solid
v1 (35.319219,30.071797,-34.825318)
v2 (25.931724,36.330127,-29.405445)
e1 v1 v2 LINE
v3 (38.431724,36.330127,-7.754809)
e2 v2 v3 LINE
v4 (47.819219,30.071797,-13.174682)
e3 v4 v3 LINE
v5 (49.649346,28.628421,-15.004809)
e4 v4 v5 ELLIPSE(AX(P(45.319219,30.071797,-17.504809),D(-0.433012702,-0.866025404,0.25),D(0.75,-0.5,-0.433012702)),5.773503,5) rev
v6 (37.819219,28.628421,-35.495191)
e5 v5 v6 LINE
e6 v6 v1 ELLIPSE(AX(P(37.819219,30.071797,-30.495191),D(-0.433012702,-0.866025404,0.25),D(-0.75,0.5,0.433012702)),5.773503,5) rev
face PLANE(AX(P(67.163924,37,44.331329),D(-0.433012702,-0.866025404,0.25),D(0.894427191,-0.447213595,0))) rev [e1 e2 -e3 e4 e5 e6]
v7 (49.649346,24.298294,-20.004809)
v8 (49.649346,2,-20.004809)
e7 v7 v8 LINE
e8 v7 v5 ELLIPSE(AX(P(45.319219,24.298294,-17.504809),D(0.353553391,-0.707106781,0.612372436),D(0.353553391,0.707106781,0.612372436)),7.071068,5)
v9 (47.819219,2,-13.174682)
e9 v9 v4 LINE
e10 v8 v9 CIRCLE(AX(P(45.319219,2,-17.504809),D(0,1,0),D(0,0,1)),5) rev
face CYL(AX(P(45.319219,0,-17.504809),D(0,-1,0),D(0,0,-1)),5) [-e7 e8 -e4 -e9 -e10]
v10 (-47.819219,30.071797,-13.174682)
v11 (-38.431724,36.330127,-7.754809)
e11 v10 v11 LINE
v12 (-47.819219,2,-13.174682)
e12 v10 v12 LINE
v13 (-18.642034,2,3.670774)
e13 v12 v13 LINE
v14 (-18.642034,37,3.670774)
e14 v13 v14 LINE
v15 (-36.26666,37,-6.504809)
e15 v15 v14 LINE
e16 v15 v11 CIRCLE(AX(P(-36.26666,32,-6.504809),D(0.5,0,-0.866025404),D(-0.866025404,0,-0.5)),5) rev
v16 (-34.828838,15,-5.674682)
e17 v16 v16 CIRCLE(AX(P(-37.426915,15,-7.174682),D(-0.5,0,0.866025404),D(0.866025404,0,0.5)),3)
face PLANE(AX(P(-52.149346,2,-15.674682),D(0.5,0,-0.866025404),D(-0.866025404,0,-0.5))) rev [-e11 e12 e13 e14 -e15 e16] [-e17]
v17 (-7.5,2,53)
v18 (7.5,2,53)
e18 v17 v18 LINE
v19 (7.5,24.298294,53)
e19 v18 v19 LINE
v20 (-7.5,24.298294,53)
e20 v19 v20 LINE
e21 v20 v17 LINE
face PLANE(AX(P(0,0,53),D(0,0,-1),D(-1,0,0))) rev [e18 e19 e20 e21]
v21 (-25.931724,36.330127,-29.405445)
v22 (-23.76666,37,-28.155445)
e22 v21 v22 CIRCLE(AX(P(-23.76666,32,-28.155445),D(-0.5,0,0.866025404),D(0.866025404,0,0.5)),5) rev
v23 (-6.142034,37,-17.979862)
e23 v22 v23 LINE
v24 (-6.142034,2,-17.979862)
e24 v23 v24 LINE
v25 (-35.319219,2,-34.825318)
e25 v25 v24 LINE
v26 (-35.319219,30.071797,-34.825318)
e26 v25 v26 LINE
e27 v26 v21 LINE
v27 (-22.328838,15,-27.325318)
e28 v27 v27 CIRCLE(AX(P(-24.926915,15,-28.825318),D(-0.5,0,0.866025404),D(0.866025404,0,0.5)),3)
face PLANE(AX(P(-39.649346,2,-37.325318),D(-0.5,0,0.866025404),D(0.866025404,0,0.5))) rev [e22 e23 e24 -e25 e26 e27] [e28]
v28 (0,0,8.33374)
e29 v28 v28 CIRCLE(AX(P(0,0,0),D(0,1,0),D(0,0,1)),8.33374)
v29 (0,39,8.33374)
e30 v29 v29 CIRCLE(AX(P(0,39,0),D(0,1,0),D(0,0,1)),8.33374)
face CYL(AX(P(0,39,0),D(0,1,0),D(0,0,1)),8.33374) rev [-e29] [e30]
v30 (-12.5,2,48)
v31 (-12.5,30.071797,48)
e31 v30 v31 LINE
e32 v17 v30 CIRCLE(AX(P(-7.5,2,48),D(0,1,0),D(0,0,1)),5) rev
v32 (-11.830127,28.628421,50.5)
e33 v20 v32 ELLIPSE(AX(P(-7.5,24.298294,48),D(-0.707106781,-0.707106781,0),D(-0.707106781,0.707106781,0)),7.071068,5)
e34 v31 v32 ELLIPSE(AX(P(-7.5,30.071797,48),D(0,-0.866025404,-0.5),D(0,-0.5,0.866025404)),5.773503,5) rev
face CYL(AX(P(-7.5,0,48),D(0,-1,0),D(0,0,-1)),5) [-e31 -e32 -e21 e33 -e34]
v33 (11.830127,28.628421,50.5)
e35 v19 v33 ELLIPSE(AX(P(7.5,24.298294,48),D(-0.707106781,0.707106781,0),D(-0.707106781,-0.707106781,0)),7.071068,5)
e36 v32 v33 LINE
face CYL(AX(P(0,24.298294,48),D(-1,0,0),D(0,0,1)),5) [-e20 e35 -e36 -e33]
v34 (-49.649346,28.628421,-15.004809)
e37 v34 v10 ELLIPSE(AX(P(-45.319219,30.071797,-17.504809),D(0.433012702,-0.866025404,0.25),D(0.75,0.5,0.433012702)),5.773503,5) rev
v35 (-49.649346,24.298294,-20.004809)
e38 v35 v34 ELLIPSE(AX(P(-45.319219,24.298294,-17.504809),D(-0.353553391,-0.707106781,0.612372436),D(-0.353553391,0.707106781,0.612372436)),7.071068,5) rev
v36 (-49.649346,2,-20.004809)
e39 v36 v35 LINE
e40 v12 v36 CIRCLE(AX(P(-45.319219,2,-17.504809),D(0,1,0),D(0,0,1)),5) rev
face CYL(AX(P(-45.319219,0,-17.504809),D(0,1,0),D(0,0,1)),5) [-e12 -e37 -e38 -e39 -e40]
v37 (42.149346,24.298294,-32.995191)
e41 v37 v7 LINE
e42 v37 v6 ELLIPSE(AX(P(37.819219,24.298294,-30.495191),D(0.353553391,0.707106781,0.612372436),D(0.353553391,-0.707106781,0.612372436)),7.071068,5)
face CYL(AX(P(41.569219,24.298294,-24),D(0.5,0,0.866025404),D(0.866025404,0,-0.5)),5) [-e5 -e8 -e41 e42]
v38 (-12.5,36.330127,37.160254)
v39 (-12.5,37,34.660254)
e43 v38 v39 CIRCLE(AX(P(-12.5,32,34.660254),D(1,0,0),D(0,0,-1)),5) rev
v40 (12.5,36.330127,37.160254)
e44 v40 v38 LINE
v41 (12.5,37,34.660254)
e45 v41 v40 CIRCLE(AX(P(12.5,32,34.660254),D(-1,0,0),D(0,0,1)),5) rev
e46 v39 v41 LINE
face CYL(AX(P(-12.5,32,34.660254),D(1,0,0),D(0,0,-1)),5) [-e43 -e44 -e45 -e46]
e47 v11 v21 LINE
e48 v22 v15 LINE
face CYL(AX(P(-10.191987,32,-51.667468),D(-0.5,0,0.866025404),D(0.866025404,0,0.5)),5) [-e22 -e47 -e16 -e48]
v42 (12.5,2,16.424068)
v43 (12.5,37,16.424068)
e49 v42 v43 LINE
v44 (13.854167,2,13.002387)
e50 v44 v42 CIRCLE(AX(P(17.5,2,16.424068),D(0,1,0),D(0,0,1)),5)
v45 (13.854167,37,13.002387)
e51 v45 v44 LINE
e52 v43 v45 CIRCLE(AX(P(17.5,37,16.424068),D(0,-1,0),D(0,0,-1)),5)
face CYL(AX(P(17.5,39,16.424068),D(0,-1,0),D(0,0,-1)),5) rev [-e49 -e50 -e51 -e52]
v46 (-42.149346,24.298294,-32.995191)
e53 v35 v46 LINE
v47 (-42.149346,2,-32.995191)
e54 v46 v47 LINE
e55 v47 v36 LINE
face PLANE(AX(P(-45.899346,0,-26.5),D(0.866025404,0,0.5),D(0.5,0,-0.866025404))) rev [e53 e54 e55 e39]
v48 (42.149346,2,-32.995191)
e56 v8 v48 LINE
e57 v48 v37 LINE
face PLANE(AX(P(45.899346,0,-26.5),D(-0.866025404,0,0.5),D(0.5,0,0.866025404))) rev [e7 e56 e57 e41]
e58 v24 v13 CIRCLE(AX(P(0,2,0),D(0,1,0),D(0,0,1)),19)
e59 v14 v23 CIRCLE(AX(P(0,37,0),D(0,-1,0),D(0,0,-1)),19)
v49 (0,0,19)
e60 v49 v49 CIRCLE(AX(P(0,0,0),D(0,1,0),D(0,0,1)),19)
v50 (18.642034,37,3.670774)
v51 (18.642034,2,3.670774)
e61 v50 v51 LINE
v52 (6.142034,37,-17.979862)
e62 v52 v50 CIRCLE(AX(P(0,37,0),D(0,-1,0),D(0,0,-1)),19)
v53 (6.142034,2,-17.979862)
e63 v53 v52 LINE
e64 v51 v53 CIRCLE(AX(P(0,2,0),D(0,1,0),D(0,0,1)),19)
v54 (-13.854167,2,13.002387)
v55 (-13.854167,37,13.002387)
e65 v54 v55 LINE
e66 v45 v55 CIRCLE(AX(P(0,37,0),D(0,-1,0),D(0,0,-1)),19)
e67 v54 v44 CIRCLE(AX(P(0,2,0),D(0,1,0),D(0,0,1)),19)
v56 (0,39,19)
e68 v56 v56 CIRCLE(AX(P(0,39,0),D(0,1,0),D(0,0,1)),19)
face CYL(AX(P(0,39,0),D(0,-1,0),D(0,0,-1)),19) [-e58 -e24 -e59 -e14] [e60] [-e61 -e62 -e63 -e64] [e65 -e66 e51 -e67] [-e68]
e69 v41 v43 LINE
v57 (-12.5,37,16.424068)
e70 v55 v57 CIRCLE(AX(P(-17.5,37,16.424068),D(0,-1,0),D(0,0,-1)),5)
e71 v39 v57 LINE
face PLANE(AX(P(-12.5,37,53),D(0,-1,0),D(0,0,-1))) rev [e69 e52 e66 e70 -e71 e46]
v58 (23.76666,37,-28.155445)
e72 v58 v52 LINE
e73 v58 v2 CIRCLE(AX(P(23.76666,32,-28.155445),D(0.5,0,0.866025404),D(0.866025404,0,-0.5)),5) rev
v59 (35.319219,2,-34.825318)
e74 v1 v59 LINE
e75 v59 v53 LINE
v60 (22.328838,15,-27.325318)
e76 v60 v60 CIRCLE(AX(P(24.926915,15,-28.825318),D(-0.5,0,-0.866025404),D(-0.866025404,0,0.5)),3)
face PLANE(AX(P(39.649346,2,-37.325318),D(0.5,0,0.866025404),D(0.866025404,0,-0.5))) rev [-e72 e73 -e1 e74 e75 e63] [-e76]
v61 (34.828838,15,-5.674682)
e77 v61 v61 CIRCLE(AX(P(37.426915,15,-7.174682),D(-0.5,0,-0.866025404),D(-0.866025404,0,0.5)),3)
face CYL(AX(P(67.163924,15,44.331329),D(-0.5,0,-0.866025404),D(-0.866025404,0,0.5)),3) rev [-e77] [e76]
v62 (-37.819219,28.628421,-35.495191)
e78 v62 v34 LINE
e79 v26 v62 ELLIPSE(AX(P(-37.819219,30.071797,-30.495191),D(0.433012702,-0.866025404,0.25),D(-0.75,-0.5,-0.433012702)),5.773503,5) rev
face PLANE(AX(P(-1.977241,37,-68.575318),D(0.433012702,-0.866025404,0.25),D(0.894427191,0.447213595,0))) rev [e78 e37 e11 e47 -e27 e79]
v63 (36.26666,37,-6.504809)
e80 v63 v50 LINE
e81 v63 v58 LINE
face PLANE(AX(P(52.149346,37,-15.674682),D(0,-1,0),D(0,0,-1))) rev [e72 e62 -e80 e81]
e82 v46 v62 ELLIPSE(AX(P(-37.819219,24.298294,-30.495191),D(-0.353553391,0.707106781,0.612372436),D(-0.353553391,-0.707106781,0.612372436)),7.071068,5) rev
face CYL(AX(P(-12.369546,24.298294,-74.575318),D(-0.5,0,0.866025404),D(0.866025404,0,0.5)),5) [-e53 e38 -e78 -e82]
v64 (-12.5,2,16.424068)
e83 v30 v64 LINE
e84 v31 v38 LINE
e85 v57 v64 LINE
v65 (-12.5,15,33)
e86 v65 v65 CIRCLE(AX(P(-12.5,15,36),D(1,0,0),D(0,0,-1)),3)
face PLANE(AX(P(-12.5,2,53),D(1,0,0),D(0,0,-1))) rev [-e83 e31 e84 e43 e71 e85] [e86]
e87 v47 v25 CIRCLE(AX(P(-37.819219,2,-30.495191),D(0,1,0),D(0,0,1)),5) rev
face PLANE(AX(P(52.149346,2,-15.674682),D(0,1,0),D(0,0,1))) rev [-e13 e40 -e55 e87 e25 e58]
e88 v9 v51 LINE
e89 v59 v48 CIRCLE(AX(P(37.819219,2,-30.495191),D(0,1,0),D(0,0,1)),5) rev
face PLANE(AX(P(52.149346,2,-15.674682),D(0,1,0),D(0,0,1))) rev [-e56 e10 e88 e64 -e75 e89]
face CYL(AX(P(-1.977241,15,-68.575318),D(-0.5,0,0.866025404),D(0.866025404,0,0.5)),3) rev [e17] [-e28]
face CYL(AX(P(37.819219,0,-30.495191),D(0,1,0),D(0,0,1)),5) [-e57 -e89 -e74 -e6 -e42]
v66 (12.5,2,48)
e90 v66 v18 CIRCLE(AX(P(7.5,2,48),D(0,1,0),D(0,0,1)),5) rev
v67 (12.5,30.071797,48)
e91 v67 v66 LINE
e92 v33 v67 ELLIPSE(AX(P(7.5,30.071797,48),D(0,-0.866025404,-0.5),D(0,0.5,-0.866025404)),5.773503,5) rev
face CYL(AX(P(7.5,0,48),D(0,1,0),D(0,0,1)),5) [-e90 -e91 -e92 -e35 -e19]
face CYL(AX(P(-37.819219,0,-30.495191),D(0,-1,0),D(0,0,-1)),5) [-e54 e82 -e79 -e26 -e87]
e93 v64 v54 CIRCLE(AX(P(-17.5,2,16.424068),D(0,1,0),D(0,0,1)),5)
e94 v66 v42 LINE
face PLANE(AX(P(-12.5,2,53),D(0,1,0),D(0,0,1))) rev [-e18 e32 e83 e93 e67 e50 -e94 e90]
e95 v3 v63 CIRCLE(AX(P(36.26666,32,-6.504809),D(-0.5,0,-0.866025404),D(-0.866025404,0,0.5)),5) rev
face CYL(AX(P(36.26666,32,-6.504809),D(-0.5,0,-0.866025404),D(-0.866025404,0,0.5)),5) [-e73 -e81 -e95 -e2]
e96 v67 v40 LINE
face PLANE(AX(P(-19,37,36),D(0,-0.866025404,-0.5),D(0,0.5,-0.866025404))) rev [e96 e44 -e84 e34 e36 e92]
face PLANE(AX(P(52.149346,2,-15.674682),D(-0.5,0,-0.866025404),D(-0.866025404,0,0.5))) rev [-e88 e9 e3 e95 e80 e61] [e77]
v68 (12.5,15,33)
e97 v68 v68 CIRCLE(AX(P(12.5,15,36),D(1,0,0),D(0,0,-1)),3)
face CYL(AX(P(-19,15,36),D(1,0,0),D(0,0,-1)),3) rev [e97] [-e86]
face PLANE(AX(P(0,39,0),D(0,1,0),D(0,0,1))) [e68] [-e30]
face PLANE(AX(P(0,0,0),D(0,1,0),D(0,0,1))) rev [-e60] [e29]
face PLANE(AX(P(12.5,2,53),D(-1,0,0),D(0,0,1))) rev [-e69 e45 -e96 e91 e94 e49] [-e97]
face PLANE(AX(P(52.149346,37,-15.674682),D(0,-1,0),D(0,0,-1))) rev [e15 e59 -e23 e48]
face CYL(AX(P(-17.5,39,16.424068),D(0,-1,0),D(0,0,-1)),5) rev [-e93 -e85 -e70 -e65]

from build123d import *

# Parameters (mm, degrees)
CROQUIS2_R                = 19
SALIENTE_EXTRUIR1_DEPTH   = 39
CROQUIS3_W                = 25
CROQUIS3_H                = 35
SALIENTE_EXTRUIR2_DEPTH   = 53
CROQUIS4_R                = 3
CORTAR_EXTRUIR1_DEPTH     = 73.953752474
REDONDEO1_R               = 5
MATRIZC2_START            = 2
MATRIZC2_DEPTH            = 9.9999999
MATRIZC2_START_2          = 18.0000001
MATRIZC2_2_DEPTH          = 6.298293978
MATRIZC2_START_3          = 11.9999999
MATRIZC2_3_DEPTH          = 25.0000001
MATRIZC2_START_4          = -12.5
MATRIZC2_4_OUTLINE_R      = 3
MATRIZC2_4_DEPTH          = 25
MATRIZC2_5_OUTLINE_R      = 3
MATRIZC2_5_DEPTH          = 25
TALADRO_ROSCADO_3_4_102_D = 16.66748


with BuildPart() as part:
    # Croquis2 → Saliente-Extruir1 (new body)
    with BuildSketch(Plane(origin=(0, 0, 0), x_dir=(1, 0, 0), z_dir=(0, 1, 0))):
        with Locations(Location((0, 0, 0), (0, 0, 270))):
            Circle(CROQUIS2_R)
    extrude(amount=SALIENTE_EXTRUIR1_DEPTH)

    # Croquis3 → Saliente-Extruir2 (add)
    with BuildSketch(Plane.XY):
        with Locations((0, 19.5)):
            Rectangle(CROQUIS3_W, CROQUIS3_H)
    extrude(amount=SALIENTE_EXTRUIR2_DEPTH)

    # Croquis4 → Cortar-Extruir1 (cut, through all)
    with BuildSketch(Plane(origin=(12.5, 0, 0), x_dir=(0, 0, -1), z_dir=(1, 0, 0))):
        with Locations((-36, 15)):
            Circle(CROQUIS4_R)
        Polygon((-53, 27.185045424), (-53, 37), (-36, 37), align=None)
    extrude(amount=-CORTAR_EXTRUIR1_DEPTH, mode=Mode.SUBTRACT)

    # Redondeo1
    redondeo1_edges = [part.edges().sort_by_distance(p)[0] for p in [
        (12.5, 14.592522712, 53),
        (-12.5, 14.592522712, 53),
        (0, 27.185045424, 53),
        (0, 37, 36),
        (12.5, 19.5, 14.309088021),
        (-12.5, 19.5, 14.309088021),
    ]]
    fillet(redondeo1_edges, radius=REDONDEO1_R)

    # MatrizC2: read off the stored shape, not the designer's step
    # MatrizC2 outline → MatrizC2 (add)
    with BuildSketch(Plane(origin=(0, 0, 0), x_dir=(1, 0, 0), z_dir=(0, 1, 0)).offset(MATRIZC2_START)):
        with BuildLine():
            Line((-42.149346401, 32.995190528), (-49.649346401, 20.004809472))
            ThreePointArc((-49.649346401, 20.004809472), (-50.148848513, 16.210714247), (-47.819219382, 13.174682453))
            Line((-47.819219382, 13.174682453), (-18.642033731, -3.670773537))
            ThreePointArc((-18.642033731, -3.670773537), (-16.454482672, 9.5), (-6.142033731, 17.979861558))
            Line((-6.142033731, 17.979861558), (-35.319219382, 34.825317547))
            ThreePointArc((-35.319219382, 34.825317547), (-39.113314608, 35.32481966), (-42.149346401, 32.995190528))
        make_face()
        with BuildLine():
            ThreePointArc((6.142033731, 17.979861558), (16.454482672, 9.5), (18.642033731, -3.670773537))
            Line((18.642033731, -3.670773537), (47.819219382, 13.174682453))
            ThreePointArc((47.819219382, 13.174682453), (50.148848513, 16.210714247), (49.649346401, 20.004809472))
            Line((49.649346401, 20.004809472), (42.149346401, 32.995190528))
            ThreePointArc((42.149346401, 32.995190528), (39.113314608, 35.32481966), (35.319219382, 34.825317547))
            Line((35.319219382, 34.825317547), (6.142033731, 17.979861558))
        make_face()
    extrude(amount=MATRIZC2_DEPTH)

    # MatrizC2 2 outline → MatrizC2 2 (add)
    with BuildSketch(Plane(origin=(0, 0, 0), x_dir=(1, 0, 0), z_dir=(0, 1, 0)).offset(MATRIZC2_START_2)):
        with BuildLine():
            Line((-42.149346401, 32.995190528), (-49.649346401, 20.004809472))
            ThreePointArc((-49.649346401, 20.004809472), (-50.148848513, 16.210714247), (-47.819219382, 13.174682453))
            Line((-47.819219382, 13.174682453), (-18.642033731, -3.670773537))
            ThreePointArc((-18.642033731, -3.670773537), (-16.454482672, 9.5), (-6.142033731, 17.979861558))
            Line((-6.142033731, 17.979861558), (-35.319219382, 34.825317547))
            ThreePointArc((-35.319219382, 34.825317547), (-39.113314608, 35.32481966), (-42.149346401, 32.995190528))
        make_face()
        with BuildLine():
            ThreePointArc((6.142033731, 17.979861558), (16.454482672, 9.5), (18.642033731, -3.670773537))
            Line((18.642033731, -3.670773537), (47.819219382, 13.174682453))
            ThreePointArc((47.819219382, 13.174682453), (50.148848513, 16.210714247), (49.649346401, 20.004809472))
            Line((49.649346401, 20.004809472), (42.149346401, 32.995190528))
            ThreePointArc((42.149346401, 32.995190528), (39.113314608, 35.32481966), (35.319219382, 34.825317547))
            Line((35.319219382, 34.825317547), (6.142033731, 17.979861558))
        make_face()
    extrude(amount=MATRIZC2_2_DEPTH)

    # MatrizC2 3 outline → MatrizC2 3 (add)
    with BuildSketch(Plane(origin=(0, 0, 0), x_dir=(1, 0, 0), z_dir=(0, 1, 0)).offset(MATRIZC2_START_3)):
        with BuildLine():
            Line((-42.149346401, 32.995190528), (-49.649346401, 20.004809472))
            ThreePointArc((-49.649346401, 20.004809472), (-50.148848513, 16.210714247), (-47.819219382, 13.174682453))
            Line((-47.819219382, 13.174682453), (-18.642033731, -3.670773537))
            ThreePointArc((-18.642033731, -3.670773537), (-16.454482672, 9.5), (-6.142033731, 17.979861558))
            Line((-6.142033731, 17.979861558), (-35.319219382, 34.825317547))
            ThreePointArc((-35.319219382, 34.825317547), (-39.113314608, 35.32481966), (-42.149346401, 32.995190528))
        make_face()
        with BuildLine():
            ThreePointArc((6.142033731, 17.979861558), (16.454482672, 9.5), (18.642033731, -3.670773537))
            Line((18.642033731, -3.670773537), (47.819219382, 13.174682453))
            ThreePointArc((47.819219382, 13.174682453), (50.148848513, 16.210714247), (49.649346401, 20.004809472))
            Line((49.649346401, 20.004809472), (42.149346401, 32.995190528))
            ThreePointArc((42.149346401, 32.995190528), (39.113314608, 35.32481966), (35.319219382, 34.825317547))
            Line((35.319219382, 34.825317547), (6.142033731, 17.979861558))
        make_face()
    extrude(amount=MATRIZC2_3_DEPTH)

    # MatrizC2 4 outline → MatrizC2 4 (cut)
    with BuildSketch(Plane(origin=(0, 0, 0), x_dir=(0.8660254037844362, 0, -0.5000000000000042), z_dir=(0.5000000000000042, 0, 0.8660254037844363)).offset(MATRIZC2_START_4)):
        with BuildLine():
            ThreePointArc((34.660254038, 37), (35.954349263, 36.829629131), (37.160254038, 36.330127019))
            Line((37.160254038, 36.330127019), (50.5, 28.628421097))
            ThreePointArc((50.5, 28.628421097), (52.330127019, 26.798294078), (53, 24.298294078))
            Line((53, 24.298294078), (53.000000001, 37))
            Line((53.000000001, 37), (34.660254038, 37))
        make_face()
        with Locations((36, 15)):
            Circle(MATRIZC2_4_OUTLINE_R)
    extrude(amount=MATRIZC2_4_DEPTH, mode=Mode.SUBTRACT)

    # MatrizC2 5 outline → MatrizC2 5 (cut)
    with BuildSketch(Plane(origin=(0, 0, 0), x_dir=(0.8660254037844431, 0, 0.4999999999999921), z_dir=(0.4999999999999921, 0, -0.8660254037844433)).offset(MATRIZC2_START_4)):
        with BuildLine():
            ThreePointArc((-34.660254038, -37), (-35.954349263, -36.829629131), (-37.160254038, -36.330127019))
            Line((-37.160254038, -36.330127019), (-50.5, -28.628421097))
            ThreePointArc((-50.5, -28.628421097), (-52.330127019, -26.798294078), (-53, -24.298294078))
            Line((-53, -24.298294078), (-53, -37))
            Line((-53, -37), (-34.660254038, -37))
        make_face()
        with Locations((-36, -15)):
            Circle(MATRIZC2_5_OUTLINE_R)
    extrude(amount=MATRIZC2_5_DEPTH, mode=Mode.SUBTRACT)

    # Taladro roscado 3/4-102 (through all)
    with Locations(Plane.ZX.offset(39)):
        with Locations((0, 0)):
            Hole(TALADRO_ROSCADO_3_4_102_D / 2)


solid = part.part
